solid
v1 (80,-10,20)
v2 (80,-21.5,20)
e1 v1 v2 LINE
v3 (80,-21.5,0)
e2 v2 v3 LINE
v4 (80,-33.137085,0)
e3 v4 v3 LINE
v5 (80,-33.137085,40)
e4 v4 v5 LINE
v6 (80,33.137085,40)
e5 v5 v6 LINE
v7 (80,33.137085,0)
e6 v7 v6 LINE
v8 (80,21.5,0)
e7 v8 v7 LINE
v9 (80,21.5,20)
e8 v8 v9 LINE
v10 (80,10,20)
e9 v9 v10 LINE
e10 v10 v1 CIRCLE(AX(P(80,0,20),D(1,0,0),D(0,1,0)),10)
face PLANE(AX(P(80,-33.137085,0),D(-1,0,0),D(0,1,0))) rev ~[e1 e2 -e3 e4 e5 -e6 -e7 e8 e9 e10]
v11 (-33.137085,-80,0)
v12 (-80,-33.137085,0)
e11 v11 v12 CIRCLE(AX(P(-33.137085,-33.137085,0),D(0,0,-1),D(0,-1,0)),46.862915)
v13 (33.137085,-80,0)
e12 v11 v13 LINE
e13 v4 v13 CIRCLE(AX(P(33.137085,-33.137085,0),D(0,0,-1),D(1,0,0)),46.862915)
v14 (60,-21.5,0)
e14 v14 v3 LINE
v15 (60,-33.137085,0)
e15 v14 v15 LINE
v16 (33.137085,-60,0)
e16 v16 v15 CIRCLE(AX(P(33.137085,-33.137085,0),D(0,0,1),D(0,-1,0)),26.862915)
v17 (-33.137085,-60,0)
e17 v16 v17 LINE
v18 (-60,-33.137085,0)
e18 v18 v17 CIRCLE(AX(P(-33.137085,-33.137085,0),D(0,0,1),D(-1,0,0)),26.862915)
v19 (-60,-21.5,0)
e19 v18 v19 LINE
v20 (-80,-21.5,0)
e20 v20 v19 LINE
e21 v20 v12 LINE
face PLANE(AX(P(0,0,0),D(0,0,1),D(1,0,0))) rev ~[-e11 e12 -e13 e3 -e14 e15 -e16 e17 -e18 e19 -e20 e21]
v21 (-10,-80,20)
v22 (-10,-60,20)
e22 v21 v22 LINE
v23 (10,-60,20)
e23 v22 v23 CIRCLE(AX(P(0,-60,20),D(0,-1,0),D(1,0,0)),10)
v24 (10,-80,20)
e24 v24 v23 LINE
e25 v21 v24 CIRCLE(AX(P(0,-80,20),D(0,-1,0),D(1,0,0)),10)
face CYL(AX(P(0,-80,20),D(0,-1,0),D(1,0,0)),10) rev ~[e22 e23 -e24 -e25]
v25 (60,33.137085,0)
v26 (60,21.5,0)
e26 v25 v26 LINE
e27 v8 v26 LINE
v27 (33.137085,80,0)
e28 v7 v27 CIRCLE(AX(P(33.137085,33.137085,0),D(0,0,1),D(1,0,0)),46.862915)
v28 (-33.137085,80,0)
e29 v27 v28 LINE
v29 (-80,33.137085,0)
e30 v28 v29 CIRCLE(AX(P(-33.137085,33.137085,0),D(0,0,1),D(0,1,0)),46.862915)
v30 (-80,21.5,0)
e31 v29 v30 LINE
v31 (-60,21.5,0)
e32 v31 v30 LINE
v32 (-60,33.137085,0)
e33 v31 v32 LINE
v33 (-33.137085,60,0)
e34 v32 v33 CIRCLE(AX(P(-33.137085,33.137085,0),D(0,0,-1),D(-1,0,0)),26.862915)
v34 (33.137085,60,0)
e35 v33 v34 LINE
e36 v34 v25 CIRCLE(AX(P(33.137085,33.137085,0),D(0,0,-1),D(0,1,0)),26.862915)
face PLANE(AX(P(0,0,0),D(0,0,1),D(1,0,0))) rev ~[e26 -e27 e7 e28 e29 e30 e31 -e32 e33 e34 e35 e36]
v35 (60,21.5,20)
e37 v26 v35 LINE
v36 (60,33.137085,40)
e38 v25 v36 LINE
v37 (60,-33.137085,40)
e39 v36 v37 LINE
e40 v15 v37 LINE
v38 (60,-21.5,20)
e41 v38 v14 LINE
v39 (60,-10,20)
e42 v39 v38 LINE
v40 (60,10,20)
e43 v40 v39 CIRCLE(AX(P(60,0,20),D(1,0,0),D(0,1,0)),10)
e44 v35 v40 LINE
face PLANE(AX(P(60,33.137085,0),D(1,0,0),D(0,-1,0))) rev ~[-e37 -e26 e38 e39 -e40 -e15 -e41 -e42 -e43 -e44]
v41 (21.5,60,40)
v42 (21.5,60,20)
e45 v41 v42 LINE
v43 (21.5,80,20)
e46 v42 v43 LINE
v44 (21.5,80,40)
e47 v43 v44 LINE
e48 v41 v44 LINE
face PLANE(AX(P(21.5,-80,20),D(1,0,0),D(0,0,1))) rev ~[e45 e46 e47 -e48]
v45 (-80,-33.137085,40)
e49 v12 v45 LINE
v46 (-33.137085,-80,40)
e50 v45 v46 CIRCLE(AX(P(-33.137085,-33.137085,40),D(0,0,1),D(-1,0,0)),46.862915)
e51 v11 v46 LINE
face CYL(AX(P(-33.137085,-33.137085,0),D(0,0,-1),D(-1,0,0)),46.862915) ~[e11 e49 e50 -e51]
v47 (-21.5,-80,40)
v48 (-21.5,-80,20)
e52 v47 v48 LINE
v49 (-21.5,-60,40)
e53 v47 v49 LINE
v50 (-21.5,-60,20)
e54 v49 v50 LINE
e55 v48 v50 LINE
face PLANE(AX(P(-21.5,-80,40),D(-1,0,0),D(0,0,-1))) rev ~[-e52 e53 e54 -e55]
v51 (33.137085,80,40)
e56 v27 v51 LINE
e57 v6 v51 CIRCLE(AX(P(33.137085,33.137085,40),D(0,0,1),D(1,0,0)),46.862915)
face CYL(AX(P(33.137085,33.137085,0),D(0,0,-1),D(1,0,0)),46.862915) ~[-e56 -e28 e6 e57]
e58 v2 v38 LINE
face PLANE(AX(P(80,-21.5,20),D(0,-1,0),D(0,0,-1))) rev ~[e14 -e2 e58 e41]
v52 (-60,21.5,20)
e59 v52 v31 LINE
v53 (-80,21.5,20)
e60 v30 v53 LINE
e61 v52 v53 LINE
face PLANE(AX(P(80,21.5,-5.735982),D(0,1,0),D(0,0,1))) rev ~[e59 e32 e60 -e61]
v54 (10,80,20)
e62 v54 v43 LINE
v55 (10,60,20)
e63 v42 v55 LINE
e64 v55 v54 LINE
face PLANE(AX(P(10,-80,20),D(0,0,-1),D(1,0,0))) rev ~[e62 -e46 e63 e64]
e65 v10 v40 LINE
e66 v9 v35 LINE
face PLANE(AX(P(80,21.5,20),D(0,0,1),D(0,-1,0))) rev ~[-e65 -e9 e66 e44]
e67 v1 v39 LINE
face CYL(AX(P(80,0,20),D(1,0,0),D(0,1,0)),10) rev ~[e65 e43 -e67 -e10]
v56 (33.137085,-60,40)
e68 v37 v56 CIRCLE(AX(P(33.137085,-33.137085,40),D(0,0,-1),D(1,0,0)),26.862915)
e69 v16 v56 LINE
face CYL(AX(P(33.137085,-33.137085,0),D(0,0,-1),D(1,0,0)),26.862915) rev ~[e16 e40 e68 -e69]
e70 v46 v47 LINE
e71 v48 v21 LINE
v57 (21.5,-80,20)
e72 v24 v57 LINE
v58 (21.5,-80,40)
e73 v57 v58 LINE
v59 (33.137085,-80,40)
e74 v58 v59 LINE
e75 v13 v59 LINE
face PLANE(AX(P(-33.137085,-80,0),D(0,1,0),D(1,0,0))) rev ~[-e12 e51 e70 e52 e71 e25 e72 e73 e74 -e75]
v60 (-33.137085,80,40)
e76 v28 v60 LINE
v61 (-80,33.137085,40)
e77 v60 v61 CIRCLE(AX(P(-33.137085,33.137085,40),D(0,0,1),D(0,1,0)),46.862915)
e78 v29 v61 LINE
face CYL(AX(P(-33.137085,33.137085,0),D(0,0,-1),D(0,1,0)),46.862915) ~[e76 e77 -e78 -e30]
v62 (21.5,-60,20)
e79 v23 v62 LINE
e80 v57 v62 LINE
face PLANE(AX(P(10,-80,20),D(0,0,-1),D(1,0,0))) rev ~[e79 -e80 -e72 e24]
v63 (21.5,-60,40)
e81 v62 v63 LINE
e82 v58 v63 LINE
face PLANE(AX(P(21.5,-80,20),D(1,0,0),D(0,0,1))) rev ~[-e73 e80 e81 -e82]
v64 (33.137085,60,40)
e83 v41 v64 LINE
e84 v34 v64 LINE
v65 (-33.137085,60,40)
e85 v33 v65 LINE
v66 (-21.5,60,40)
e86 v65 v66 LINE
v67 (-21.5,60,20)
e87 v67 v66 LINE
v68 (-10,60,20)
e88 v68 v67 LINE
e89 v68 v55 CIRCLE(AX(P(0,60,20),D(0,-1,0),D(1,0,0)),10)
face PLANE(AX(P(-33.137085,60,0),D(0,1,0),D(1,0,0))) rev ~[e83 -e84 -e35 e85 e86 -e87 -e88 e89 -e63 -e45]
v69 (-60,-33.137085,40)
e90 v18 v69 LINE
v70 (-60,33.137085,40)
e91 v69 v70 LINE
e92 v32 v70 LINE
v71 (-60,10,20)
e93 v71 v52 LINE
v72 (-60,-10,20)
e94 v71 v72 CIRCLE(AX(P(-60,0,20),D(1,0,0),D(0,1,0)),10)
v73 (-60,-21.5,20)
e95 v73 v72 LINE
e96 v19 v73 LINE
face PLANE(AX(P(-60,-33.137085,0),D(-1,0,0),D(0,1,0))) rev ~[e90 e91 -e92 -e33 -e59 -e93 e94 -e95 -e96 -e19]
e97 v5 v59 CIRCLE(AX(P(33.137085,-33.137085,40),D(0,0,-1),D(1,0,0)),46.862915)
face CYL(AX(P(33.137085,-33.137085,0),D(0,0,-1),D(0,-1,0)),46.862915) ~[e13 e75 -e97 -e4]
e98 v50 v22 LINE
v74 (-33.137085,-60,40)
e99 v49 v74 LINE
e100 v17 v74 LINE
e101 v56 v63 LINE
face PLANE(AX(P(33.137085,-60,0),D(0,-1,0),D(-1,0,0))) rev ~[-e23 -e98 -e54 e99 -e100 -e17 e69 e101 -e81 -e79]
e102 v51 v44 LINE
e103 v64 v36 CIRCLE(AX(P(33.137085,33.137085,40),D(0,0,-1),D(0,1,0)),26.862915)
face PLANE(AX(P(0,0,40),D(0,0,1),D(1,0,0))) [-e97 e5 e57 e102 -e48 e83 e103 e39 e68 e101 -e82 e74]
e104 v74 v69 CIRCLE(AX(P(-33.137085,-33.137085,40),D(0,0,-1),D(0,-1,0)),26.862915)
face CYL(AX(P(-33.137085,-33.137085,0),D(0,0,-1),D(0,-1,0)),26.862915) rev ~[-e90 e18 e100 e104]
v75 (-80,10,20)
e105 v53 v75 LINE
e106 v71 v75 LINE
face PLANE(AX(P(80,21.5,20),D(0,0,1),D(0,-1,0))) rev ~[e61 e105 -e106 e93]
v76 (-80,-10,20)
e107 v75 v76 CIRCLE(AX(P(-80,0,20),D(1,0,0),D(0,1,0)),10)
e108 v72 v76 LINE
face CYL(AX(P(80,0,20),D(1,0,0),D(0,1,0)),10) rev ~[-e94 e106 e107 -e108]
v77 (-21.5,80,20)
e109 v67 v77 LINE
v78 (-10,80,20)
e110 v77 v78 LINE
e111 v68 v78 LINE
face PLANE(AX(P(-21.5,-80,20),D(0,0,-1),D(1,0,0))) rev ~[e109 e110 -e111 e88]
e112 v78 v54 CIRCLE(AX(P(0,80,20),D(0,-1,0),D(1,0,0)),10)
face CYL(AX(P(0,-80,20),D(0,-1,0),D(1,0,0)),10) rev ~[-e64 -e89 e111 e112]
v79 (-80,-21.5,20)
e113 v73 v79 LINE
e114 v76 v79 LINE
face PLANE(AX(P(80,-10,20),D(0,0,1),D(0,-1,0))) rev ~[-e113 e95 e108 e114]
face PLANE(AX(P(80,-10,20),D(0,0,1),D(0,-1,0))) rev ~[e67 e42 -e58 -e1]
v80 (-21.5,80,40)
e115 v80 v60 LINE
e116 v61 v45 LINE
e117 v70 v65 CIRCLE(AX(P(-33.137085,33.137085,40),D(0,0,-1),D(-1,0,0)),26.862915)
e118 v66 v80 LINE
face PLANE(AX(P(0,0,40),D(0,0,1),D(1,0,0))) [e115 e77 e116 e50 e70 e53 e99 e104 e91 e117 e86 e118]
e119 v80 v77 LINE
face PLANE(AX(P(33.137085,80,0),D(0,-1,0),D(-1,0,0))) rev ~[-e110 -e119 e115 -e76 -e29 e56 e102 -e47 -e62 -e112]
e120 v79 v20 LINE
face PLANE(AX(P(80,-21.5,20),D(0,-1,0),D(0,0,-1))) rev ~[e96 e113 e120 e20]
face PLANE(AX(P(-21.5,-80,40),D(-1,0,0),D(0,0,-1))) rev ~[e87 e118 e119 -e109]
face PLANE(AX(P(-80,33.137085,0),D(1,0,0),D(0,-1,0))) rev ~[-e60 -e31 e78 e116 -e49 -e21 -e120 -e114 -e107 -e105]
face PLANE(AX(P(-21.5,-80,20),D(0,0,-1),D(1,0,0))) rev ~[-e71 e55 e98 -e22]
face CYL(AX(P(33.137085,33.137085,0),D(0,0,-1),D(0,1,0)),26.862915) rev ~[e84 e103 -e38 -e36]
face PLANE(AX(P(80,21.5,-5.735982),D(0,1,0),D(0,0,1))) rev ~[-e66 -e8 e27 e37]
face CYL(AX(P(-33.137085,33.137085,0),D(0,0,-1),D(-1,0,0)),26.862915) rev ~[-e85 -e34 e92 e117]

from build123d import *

# Parameters (mm, degrees)
F1_DEPTH      = 40
F2_R          = 10
F3_DEPTH      = 180
F3_DEPTH_BACK = 20
F4_R          = 10
F5_DEPTH      = 20
F5_DEPTH_BACK = 180
F7_DEPTH      = 181.4
F9_DEPTH      = 244.2


# Not quite as in the source:
# - a feature names something its author has since deleted; it is built from what else it names


with BuildPart() as f1:
    # F0 (on Top) → F1 (new body)
    with BuildSketch(Plane.XY):
        with BuildLine():
            Line((-33.1370849898, -80), (33.1370849898, -80))
            ThreePointArc((33.1370849898, -80), (66.2741699797, -66.2741699797), (80, -33.1370849898))
            Line((80, -33.1370849898), (80, 33.1370849898))
            ThreePointArc((80, 33.1370849898), (66.2741699797, 66.2741699797), (33.1370849898, 80))
            Line((33.1370849898, 80), (-33.1370849898, 80))
            ThreePointArc((-33.1370849898, 80), (-66.2741699797, 66.2741699797), (-80, 33.1370849898))
            Line((-80, 33.1370849898), (-80, -33.1370849898))
            ThreePointArc((-80, -33.1370849898), (-66.2741699797, -66.2741699797), (-33.1370849898, -80))
        make_face()
        with BuildLine():
            Line((33.1370849898, -60), (24.8528137424, -60))
            Line((24.8528137424, -60), (-24.8528137424, -60))
            Line((-24.8528137424, -60), (-33.1370849898, -60))
            ThreePointArc((-33.1370849898, -60), (-52.132034356, -52.132034356), (-60, -33.1370849898))
            Line((-60, -33.1370849898), (-60, -24.8528137424))
            Line((-60, -24.8528137424), (-60, 24.8528137424))
            Line((-60, 24.8528137424), (-60, 33.1370849898))
            ThreePointArc((-60, 33.1370849898), (-52.132034356, 52.132034356), (-33.1370849898, 60))
            Line((-33.1370849898, 60), (-24.8528137424, 60))
            Line((-24.8528137424, 60), (24.8528137424, 60))
            Line((24.8528137424, 60), (33.1370849898, 60))
            ThreePointArc((33.1370849898, 60), (52.132034356, 52.132034356), (60, 33.1370849898))
            Line((60, 33.1370849898), (60, 24.8528137424))
            Line((60, 24.8528137424), (60, -24.8528137424))
            Line((60, -24.8528137424), (60, -33.1370849898))
            ThreePointArc((60, -33.1370849898), (52.132034356, -52.132034356), (33.1370849898, -60))
        make_face(mode=Mode.SUBTRACT)
    extrude(amount=F1_DEPTH)

    # F2 (on face) → F3 (cut, two sides)
    with BuildSketch(Plane.XZ.offset(80)) as f3_sk:
        with Locations((0, 20)):
            Circle(F2_R)
    extrude(amount=-F3_DEPTH, mode=Mode.SUBTRACT)
    extrude(f3_sk.sketch, amount=F3_DEPTH_BACK, mode=Mode.SUBTRACT)

    # F4 (on face) → F5 (cut, two sides)
    with BuildSketch(Plane.YZ.offset(80)) as f5_sk:
        with Locations((0, 20)):
            Circle(F4_R)
    extrude(amount=F5_DEPTH, mode=Mode.SUBTRACT)
    extrude(f5_sk.sketch, amount=-F5_DEPTH_BACK, mode=Mode.SUBTRACT)

    # F6 (on face) → F7 (cut)
    with BuildSketch(Plane.XZ.offset(80)):
        Polygon((-21.5, 40), (0, 40), (0, 51.6958795488), (-57.5, 51.6958795488), (-71.9271823764, 52.9654417948), (-71.9271823764, 40), (-59.4264046908, 40), (-33.1370849898, 40), align=None)
        with BuildLine():
            Line((0, 40), (0, 30))
            ThreePointArc((0, 30), (7.0710678119, 27.0710678119), (10, 20))
            Line((10, 20), (21.5, 20))
            Line((21.5, 20), (21.5, 33))
            Line((21.5, 33), (21.5, 40))
            Line((21.5, 40), (0, 40))
        make_face()
        Polygon((0, 51.6958795488), (0, 40), (21.5, 40), (21.5, 45.9314808249), (59.4264046908, 40), (71.9271823764, 40), (71.9271823764, 52.9654417948), (57.5, 51.6958795488), align=None)
        with BuildLine():
            Line((-21.5, 20), (-10, 20))
            ThreePointArc((-10, 20), (-7.0710678119, 27.0710678119), (0, 30))
            Line((0, 30), (0, 40))
            Line((0, 40), (-21.5, 40))
            Line((-21.5, 40), (-21.5, 33))
            Line((-21.5, 33), (-21.5, 20))
        make_face()
    extrude(amount=-F7_DEPTH, mode=Mode.SUBTRACT)

    # F8 (on face) → F9 (cut)
    with BuildSketch(Plane.YZ.offset(80)):
        Polygon((21.5, 0), (0, 0), (0, -11.1064584926), (57.5, -11.1064584926), (66.6687613726, -11.8878306821), (66.6687613726, 0), (59.4264046908, 0), (21.5, -5.7359817438), align=None)
        with BuildLine():
            ThreePointArc((10, 20), (7.0710678119, 12.9289321881), (0, 10))
            Line((0, 10), (0, 0))
            Line((0, 0), (21.5, 0))
            Line((21.5, 0), (21.5, 7))
            Line((21.5, 7), (21.5, 20))
            Line((21.5, 20), (10, 20))
        make_face()
        with BuildLine():
            ThreePointArc((0, 10), (-7.0710678119, 12.9289321881), (-10, 20))
            Line((-10, 20), (-21.5, 20))
            Line((-21.5, 20), (-21.5, 7))
            Line((-21.5, 7), (-21.5, 0))
            Line((-21.5, 0), (0, 0))
            Line((0, 0), (0, 10))
        make_face()
        Polygon((0, -11.1064584926), (0, 0), (-21.5, 0), (-21.5, -3.4078599419), (-59.4264046908, 0), (-66.6687613726, 0), (-66.6687613726, -11.8878306821), (-57.5, -11.1064584926), align=None)
    extrude(amount=-F9_DEPTH, mode=Mode.SUBTRACT)


solid = f1.part
